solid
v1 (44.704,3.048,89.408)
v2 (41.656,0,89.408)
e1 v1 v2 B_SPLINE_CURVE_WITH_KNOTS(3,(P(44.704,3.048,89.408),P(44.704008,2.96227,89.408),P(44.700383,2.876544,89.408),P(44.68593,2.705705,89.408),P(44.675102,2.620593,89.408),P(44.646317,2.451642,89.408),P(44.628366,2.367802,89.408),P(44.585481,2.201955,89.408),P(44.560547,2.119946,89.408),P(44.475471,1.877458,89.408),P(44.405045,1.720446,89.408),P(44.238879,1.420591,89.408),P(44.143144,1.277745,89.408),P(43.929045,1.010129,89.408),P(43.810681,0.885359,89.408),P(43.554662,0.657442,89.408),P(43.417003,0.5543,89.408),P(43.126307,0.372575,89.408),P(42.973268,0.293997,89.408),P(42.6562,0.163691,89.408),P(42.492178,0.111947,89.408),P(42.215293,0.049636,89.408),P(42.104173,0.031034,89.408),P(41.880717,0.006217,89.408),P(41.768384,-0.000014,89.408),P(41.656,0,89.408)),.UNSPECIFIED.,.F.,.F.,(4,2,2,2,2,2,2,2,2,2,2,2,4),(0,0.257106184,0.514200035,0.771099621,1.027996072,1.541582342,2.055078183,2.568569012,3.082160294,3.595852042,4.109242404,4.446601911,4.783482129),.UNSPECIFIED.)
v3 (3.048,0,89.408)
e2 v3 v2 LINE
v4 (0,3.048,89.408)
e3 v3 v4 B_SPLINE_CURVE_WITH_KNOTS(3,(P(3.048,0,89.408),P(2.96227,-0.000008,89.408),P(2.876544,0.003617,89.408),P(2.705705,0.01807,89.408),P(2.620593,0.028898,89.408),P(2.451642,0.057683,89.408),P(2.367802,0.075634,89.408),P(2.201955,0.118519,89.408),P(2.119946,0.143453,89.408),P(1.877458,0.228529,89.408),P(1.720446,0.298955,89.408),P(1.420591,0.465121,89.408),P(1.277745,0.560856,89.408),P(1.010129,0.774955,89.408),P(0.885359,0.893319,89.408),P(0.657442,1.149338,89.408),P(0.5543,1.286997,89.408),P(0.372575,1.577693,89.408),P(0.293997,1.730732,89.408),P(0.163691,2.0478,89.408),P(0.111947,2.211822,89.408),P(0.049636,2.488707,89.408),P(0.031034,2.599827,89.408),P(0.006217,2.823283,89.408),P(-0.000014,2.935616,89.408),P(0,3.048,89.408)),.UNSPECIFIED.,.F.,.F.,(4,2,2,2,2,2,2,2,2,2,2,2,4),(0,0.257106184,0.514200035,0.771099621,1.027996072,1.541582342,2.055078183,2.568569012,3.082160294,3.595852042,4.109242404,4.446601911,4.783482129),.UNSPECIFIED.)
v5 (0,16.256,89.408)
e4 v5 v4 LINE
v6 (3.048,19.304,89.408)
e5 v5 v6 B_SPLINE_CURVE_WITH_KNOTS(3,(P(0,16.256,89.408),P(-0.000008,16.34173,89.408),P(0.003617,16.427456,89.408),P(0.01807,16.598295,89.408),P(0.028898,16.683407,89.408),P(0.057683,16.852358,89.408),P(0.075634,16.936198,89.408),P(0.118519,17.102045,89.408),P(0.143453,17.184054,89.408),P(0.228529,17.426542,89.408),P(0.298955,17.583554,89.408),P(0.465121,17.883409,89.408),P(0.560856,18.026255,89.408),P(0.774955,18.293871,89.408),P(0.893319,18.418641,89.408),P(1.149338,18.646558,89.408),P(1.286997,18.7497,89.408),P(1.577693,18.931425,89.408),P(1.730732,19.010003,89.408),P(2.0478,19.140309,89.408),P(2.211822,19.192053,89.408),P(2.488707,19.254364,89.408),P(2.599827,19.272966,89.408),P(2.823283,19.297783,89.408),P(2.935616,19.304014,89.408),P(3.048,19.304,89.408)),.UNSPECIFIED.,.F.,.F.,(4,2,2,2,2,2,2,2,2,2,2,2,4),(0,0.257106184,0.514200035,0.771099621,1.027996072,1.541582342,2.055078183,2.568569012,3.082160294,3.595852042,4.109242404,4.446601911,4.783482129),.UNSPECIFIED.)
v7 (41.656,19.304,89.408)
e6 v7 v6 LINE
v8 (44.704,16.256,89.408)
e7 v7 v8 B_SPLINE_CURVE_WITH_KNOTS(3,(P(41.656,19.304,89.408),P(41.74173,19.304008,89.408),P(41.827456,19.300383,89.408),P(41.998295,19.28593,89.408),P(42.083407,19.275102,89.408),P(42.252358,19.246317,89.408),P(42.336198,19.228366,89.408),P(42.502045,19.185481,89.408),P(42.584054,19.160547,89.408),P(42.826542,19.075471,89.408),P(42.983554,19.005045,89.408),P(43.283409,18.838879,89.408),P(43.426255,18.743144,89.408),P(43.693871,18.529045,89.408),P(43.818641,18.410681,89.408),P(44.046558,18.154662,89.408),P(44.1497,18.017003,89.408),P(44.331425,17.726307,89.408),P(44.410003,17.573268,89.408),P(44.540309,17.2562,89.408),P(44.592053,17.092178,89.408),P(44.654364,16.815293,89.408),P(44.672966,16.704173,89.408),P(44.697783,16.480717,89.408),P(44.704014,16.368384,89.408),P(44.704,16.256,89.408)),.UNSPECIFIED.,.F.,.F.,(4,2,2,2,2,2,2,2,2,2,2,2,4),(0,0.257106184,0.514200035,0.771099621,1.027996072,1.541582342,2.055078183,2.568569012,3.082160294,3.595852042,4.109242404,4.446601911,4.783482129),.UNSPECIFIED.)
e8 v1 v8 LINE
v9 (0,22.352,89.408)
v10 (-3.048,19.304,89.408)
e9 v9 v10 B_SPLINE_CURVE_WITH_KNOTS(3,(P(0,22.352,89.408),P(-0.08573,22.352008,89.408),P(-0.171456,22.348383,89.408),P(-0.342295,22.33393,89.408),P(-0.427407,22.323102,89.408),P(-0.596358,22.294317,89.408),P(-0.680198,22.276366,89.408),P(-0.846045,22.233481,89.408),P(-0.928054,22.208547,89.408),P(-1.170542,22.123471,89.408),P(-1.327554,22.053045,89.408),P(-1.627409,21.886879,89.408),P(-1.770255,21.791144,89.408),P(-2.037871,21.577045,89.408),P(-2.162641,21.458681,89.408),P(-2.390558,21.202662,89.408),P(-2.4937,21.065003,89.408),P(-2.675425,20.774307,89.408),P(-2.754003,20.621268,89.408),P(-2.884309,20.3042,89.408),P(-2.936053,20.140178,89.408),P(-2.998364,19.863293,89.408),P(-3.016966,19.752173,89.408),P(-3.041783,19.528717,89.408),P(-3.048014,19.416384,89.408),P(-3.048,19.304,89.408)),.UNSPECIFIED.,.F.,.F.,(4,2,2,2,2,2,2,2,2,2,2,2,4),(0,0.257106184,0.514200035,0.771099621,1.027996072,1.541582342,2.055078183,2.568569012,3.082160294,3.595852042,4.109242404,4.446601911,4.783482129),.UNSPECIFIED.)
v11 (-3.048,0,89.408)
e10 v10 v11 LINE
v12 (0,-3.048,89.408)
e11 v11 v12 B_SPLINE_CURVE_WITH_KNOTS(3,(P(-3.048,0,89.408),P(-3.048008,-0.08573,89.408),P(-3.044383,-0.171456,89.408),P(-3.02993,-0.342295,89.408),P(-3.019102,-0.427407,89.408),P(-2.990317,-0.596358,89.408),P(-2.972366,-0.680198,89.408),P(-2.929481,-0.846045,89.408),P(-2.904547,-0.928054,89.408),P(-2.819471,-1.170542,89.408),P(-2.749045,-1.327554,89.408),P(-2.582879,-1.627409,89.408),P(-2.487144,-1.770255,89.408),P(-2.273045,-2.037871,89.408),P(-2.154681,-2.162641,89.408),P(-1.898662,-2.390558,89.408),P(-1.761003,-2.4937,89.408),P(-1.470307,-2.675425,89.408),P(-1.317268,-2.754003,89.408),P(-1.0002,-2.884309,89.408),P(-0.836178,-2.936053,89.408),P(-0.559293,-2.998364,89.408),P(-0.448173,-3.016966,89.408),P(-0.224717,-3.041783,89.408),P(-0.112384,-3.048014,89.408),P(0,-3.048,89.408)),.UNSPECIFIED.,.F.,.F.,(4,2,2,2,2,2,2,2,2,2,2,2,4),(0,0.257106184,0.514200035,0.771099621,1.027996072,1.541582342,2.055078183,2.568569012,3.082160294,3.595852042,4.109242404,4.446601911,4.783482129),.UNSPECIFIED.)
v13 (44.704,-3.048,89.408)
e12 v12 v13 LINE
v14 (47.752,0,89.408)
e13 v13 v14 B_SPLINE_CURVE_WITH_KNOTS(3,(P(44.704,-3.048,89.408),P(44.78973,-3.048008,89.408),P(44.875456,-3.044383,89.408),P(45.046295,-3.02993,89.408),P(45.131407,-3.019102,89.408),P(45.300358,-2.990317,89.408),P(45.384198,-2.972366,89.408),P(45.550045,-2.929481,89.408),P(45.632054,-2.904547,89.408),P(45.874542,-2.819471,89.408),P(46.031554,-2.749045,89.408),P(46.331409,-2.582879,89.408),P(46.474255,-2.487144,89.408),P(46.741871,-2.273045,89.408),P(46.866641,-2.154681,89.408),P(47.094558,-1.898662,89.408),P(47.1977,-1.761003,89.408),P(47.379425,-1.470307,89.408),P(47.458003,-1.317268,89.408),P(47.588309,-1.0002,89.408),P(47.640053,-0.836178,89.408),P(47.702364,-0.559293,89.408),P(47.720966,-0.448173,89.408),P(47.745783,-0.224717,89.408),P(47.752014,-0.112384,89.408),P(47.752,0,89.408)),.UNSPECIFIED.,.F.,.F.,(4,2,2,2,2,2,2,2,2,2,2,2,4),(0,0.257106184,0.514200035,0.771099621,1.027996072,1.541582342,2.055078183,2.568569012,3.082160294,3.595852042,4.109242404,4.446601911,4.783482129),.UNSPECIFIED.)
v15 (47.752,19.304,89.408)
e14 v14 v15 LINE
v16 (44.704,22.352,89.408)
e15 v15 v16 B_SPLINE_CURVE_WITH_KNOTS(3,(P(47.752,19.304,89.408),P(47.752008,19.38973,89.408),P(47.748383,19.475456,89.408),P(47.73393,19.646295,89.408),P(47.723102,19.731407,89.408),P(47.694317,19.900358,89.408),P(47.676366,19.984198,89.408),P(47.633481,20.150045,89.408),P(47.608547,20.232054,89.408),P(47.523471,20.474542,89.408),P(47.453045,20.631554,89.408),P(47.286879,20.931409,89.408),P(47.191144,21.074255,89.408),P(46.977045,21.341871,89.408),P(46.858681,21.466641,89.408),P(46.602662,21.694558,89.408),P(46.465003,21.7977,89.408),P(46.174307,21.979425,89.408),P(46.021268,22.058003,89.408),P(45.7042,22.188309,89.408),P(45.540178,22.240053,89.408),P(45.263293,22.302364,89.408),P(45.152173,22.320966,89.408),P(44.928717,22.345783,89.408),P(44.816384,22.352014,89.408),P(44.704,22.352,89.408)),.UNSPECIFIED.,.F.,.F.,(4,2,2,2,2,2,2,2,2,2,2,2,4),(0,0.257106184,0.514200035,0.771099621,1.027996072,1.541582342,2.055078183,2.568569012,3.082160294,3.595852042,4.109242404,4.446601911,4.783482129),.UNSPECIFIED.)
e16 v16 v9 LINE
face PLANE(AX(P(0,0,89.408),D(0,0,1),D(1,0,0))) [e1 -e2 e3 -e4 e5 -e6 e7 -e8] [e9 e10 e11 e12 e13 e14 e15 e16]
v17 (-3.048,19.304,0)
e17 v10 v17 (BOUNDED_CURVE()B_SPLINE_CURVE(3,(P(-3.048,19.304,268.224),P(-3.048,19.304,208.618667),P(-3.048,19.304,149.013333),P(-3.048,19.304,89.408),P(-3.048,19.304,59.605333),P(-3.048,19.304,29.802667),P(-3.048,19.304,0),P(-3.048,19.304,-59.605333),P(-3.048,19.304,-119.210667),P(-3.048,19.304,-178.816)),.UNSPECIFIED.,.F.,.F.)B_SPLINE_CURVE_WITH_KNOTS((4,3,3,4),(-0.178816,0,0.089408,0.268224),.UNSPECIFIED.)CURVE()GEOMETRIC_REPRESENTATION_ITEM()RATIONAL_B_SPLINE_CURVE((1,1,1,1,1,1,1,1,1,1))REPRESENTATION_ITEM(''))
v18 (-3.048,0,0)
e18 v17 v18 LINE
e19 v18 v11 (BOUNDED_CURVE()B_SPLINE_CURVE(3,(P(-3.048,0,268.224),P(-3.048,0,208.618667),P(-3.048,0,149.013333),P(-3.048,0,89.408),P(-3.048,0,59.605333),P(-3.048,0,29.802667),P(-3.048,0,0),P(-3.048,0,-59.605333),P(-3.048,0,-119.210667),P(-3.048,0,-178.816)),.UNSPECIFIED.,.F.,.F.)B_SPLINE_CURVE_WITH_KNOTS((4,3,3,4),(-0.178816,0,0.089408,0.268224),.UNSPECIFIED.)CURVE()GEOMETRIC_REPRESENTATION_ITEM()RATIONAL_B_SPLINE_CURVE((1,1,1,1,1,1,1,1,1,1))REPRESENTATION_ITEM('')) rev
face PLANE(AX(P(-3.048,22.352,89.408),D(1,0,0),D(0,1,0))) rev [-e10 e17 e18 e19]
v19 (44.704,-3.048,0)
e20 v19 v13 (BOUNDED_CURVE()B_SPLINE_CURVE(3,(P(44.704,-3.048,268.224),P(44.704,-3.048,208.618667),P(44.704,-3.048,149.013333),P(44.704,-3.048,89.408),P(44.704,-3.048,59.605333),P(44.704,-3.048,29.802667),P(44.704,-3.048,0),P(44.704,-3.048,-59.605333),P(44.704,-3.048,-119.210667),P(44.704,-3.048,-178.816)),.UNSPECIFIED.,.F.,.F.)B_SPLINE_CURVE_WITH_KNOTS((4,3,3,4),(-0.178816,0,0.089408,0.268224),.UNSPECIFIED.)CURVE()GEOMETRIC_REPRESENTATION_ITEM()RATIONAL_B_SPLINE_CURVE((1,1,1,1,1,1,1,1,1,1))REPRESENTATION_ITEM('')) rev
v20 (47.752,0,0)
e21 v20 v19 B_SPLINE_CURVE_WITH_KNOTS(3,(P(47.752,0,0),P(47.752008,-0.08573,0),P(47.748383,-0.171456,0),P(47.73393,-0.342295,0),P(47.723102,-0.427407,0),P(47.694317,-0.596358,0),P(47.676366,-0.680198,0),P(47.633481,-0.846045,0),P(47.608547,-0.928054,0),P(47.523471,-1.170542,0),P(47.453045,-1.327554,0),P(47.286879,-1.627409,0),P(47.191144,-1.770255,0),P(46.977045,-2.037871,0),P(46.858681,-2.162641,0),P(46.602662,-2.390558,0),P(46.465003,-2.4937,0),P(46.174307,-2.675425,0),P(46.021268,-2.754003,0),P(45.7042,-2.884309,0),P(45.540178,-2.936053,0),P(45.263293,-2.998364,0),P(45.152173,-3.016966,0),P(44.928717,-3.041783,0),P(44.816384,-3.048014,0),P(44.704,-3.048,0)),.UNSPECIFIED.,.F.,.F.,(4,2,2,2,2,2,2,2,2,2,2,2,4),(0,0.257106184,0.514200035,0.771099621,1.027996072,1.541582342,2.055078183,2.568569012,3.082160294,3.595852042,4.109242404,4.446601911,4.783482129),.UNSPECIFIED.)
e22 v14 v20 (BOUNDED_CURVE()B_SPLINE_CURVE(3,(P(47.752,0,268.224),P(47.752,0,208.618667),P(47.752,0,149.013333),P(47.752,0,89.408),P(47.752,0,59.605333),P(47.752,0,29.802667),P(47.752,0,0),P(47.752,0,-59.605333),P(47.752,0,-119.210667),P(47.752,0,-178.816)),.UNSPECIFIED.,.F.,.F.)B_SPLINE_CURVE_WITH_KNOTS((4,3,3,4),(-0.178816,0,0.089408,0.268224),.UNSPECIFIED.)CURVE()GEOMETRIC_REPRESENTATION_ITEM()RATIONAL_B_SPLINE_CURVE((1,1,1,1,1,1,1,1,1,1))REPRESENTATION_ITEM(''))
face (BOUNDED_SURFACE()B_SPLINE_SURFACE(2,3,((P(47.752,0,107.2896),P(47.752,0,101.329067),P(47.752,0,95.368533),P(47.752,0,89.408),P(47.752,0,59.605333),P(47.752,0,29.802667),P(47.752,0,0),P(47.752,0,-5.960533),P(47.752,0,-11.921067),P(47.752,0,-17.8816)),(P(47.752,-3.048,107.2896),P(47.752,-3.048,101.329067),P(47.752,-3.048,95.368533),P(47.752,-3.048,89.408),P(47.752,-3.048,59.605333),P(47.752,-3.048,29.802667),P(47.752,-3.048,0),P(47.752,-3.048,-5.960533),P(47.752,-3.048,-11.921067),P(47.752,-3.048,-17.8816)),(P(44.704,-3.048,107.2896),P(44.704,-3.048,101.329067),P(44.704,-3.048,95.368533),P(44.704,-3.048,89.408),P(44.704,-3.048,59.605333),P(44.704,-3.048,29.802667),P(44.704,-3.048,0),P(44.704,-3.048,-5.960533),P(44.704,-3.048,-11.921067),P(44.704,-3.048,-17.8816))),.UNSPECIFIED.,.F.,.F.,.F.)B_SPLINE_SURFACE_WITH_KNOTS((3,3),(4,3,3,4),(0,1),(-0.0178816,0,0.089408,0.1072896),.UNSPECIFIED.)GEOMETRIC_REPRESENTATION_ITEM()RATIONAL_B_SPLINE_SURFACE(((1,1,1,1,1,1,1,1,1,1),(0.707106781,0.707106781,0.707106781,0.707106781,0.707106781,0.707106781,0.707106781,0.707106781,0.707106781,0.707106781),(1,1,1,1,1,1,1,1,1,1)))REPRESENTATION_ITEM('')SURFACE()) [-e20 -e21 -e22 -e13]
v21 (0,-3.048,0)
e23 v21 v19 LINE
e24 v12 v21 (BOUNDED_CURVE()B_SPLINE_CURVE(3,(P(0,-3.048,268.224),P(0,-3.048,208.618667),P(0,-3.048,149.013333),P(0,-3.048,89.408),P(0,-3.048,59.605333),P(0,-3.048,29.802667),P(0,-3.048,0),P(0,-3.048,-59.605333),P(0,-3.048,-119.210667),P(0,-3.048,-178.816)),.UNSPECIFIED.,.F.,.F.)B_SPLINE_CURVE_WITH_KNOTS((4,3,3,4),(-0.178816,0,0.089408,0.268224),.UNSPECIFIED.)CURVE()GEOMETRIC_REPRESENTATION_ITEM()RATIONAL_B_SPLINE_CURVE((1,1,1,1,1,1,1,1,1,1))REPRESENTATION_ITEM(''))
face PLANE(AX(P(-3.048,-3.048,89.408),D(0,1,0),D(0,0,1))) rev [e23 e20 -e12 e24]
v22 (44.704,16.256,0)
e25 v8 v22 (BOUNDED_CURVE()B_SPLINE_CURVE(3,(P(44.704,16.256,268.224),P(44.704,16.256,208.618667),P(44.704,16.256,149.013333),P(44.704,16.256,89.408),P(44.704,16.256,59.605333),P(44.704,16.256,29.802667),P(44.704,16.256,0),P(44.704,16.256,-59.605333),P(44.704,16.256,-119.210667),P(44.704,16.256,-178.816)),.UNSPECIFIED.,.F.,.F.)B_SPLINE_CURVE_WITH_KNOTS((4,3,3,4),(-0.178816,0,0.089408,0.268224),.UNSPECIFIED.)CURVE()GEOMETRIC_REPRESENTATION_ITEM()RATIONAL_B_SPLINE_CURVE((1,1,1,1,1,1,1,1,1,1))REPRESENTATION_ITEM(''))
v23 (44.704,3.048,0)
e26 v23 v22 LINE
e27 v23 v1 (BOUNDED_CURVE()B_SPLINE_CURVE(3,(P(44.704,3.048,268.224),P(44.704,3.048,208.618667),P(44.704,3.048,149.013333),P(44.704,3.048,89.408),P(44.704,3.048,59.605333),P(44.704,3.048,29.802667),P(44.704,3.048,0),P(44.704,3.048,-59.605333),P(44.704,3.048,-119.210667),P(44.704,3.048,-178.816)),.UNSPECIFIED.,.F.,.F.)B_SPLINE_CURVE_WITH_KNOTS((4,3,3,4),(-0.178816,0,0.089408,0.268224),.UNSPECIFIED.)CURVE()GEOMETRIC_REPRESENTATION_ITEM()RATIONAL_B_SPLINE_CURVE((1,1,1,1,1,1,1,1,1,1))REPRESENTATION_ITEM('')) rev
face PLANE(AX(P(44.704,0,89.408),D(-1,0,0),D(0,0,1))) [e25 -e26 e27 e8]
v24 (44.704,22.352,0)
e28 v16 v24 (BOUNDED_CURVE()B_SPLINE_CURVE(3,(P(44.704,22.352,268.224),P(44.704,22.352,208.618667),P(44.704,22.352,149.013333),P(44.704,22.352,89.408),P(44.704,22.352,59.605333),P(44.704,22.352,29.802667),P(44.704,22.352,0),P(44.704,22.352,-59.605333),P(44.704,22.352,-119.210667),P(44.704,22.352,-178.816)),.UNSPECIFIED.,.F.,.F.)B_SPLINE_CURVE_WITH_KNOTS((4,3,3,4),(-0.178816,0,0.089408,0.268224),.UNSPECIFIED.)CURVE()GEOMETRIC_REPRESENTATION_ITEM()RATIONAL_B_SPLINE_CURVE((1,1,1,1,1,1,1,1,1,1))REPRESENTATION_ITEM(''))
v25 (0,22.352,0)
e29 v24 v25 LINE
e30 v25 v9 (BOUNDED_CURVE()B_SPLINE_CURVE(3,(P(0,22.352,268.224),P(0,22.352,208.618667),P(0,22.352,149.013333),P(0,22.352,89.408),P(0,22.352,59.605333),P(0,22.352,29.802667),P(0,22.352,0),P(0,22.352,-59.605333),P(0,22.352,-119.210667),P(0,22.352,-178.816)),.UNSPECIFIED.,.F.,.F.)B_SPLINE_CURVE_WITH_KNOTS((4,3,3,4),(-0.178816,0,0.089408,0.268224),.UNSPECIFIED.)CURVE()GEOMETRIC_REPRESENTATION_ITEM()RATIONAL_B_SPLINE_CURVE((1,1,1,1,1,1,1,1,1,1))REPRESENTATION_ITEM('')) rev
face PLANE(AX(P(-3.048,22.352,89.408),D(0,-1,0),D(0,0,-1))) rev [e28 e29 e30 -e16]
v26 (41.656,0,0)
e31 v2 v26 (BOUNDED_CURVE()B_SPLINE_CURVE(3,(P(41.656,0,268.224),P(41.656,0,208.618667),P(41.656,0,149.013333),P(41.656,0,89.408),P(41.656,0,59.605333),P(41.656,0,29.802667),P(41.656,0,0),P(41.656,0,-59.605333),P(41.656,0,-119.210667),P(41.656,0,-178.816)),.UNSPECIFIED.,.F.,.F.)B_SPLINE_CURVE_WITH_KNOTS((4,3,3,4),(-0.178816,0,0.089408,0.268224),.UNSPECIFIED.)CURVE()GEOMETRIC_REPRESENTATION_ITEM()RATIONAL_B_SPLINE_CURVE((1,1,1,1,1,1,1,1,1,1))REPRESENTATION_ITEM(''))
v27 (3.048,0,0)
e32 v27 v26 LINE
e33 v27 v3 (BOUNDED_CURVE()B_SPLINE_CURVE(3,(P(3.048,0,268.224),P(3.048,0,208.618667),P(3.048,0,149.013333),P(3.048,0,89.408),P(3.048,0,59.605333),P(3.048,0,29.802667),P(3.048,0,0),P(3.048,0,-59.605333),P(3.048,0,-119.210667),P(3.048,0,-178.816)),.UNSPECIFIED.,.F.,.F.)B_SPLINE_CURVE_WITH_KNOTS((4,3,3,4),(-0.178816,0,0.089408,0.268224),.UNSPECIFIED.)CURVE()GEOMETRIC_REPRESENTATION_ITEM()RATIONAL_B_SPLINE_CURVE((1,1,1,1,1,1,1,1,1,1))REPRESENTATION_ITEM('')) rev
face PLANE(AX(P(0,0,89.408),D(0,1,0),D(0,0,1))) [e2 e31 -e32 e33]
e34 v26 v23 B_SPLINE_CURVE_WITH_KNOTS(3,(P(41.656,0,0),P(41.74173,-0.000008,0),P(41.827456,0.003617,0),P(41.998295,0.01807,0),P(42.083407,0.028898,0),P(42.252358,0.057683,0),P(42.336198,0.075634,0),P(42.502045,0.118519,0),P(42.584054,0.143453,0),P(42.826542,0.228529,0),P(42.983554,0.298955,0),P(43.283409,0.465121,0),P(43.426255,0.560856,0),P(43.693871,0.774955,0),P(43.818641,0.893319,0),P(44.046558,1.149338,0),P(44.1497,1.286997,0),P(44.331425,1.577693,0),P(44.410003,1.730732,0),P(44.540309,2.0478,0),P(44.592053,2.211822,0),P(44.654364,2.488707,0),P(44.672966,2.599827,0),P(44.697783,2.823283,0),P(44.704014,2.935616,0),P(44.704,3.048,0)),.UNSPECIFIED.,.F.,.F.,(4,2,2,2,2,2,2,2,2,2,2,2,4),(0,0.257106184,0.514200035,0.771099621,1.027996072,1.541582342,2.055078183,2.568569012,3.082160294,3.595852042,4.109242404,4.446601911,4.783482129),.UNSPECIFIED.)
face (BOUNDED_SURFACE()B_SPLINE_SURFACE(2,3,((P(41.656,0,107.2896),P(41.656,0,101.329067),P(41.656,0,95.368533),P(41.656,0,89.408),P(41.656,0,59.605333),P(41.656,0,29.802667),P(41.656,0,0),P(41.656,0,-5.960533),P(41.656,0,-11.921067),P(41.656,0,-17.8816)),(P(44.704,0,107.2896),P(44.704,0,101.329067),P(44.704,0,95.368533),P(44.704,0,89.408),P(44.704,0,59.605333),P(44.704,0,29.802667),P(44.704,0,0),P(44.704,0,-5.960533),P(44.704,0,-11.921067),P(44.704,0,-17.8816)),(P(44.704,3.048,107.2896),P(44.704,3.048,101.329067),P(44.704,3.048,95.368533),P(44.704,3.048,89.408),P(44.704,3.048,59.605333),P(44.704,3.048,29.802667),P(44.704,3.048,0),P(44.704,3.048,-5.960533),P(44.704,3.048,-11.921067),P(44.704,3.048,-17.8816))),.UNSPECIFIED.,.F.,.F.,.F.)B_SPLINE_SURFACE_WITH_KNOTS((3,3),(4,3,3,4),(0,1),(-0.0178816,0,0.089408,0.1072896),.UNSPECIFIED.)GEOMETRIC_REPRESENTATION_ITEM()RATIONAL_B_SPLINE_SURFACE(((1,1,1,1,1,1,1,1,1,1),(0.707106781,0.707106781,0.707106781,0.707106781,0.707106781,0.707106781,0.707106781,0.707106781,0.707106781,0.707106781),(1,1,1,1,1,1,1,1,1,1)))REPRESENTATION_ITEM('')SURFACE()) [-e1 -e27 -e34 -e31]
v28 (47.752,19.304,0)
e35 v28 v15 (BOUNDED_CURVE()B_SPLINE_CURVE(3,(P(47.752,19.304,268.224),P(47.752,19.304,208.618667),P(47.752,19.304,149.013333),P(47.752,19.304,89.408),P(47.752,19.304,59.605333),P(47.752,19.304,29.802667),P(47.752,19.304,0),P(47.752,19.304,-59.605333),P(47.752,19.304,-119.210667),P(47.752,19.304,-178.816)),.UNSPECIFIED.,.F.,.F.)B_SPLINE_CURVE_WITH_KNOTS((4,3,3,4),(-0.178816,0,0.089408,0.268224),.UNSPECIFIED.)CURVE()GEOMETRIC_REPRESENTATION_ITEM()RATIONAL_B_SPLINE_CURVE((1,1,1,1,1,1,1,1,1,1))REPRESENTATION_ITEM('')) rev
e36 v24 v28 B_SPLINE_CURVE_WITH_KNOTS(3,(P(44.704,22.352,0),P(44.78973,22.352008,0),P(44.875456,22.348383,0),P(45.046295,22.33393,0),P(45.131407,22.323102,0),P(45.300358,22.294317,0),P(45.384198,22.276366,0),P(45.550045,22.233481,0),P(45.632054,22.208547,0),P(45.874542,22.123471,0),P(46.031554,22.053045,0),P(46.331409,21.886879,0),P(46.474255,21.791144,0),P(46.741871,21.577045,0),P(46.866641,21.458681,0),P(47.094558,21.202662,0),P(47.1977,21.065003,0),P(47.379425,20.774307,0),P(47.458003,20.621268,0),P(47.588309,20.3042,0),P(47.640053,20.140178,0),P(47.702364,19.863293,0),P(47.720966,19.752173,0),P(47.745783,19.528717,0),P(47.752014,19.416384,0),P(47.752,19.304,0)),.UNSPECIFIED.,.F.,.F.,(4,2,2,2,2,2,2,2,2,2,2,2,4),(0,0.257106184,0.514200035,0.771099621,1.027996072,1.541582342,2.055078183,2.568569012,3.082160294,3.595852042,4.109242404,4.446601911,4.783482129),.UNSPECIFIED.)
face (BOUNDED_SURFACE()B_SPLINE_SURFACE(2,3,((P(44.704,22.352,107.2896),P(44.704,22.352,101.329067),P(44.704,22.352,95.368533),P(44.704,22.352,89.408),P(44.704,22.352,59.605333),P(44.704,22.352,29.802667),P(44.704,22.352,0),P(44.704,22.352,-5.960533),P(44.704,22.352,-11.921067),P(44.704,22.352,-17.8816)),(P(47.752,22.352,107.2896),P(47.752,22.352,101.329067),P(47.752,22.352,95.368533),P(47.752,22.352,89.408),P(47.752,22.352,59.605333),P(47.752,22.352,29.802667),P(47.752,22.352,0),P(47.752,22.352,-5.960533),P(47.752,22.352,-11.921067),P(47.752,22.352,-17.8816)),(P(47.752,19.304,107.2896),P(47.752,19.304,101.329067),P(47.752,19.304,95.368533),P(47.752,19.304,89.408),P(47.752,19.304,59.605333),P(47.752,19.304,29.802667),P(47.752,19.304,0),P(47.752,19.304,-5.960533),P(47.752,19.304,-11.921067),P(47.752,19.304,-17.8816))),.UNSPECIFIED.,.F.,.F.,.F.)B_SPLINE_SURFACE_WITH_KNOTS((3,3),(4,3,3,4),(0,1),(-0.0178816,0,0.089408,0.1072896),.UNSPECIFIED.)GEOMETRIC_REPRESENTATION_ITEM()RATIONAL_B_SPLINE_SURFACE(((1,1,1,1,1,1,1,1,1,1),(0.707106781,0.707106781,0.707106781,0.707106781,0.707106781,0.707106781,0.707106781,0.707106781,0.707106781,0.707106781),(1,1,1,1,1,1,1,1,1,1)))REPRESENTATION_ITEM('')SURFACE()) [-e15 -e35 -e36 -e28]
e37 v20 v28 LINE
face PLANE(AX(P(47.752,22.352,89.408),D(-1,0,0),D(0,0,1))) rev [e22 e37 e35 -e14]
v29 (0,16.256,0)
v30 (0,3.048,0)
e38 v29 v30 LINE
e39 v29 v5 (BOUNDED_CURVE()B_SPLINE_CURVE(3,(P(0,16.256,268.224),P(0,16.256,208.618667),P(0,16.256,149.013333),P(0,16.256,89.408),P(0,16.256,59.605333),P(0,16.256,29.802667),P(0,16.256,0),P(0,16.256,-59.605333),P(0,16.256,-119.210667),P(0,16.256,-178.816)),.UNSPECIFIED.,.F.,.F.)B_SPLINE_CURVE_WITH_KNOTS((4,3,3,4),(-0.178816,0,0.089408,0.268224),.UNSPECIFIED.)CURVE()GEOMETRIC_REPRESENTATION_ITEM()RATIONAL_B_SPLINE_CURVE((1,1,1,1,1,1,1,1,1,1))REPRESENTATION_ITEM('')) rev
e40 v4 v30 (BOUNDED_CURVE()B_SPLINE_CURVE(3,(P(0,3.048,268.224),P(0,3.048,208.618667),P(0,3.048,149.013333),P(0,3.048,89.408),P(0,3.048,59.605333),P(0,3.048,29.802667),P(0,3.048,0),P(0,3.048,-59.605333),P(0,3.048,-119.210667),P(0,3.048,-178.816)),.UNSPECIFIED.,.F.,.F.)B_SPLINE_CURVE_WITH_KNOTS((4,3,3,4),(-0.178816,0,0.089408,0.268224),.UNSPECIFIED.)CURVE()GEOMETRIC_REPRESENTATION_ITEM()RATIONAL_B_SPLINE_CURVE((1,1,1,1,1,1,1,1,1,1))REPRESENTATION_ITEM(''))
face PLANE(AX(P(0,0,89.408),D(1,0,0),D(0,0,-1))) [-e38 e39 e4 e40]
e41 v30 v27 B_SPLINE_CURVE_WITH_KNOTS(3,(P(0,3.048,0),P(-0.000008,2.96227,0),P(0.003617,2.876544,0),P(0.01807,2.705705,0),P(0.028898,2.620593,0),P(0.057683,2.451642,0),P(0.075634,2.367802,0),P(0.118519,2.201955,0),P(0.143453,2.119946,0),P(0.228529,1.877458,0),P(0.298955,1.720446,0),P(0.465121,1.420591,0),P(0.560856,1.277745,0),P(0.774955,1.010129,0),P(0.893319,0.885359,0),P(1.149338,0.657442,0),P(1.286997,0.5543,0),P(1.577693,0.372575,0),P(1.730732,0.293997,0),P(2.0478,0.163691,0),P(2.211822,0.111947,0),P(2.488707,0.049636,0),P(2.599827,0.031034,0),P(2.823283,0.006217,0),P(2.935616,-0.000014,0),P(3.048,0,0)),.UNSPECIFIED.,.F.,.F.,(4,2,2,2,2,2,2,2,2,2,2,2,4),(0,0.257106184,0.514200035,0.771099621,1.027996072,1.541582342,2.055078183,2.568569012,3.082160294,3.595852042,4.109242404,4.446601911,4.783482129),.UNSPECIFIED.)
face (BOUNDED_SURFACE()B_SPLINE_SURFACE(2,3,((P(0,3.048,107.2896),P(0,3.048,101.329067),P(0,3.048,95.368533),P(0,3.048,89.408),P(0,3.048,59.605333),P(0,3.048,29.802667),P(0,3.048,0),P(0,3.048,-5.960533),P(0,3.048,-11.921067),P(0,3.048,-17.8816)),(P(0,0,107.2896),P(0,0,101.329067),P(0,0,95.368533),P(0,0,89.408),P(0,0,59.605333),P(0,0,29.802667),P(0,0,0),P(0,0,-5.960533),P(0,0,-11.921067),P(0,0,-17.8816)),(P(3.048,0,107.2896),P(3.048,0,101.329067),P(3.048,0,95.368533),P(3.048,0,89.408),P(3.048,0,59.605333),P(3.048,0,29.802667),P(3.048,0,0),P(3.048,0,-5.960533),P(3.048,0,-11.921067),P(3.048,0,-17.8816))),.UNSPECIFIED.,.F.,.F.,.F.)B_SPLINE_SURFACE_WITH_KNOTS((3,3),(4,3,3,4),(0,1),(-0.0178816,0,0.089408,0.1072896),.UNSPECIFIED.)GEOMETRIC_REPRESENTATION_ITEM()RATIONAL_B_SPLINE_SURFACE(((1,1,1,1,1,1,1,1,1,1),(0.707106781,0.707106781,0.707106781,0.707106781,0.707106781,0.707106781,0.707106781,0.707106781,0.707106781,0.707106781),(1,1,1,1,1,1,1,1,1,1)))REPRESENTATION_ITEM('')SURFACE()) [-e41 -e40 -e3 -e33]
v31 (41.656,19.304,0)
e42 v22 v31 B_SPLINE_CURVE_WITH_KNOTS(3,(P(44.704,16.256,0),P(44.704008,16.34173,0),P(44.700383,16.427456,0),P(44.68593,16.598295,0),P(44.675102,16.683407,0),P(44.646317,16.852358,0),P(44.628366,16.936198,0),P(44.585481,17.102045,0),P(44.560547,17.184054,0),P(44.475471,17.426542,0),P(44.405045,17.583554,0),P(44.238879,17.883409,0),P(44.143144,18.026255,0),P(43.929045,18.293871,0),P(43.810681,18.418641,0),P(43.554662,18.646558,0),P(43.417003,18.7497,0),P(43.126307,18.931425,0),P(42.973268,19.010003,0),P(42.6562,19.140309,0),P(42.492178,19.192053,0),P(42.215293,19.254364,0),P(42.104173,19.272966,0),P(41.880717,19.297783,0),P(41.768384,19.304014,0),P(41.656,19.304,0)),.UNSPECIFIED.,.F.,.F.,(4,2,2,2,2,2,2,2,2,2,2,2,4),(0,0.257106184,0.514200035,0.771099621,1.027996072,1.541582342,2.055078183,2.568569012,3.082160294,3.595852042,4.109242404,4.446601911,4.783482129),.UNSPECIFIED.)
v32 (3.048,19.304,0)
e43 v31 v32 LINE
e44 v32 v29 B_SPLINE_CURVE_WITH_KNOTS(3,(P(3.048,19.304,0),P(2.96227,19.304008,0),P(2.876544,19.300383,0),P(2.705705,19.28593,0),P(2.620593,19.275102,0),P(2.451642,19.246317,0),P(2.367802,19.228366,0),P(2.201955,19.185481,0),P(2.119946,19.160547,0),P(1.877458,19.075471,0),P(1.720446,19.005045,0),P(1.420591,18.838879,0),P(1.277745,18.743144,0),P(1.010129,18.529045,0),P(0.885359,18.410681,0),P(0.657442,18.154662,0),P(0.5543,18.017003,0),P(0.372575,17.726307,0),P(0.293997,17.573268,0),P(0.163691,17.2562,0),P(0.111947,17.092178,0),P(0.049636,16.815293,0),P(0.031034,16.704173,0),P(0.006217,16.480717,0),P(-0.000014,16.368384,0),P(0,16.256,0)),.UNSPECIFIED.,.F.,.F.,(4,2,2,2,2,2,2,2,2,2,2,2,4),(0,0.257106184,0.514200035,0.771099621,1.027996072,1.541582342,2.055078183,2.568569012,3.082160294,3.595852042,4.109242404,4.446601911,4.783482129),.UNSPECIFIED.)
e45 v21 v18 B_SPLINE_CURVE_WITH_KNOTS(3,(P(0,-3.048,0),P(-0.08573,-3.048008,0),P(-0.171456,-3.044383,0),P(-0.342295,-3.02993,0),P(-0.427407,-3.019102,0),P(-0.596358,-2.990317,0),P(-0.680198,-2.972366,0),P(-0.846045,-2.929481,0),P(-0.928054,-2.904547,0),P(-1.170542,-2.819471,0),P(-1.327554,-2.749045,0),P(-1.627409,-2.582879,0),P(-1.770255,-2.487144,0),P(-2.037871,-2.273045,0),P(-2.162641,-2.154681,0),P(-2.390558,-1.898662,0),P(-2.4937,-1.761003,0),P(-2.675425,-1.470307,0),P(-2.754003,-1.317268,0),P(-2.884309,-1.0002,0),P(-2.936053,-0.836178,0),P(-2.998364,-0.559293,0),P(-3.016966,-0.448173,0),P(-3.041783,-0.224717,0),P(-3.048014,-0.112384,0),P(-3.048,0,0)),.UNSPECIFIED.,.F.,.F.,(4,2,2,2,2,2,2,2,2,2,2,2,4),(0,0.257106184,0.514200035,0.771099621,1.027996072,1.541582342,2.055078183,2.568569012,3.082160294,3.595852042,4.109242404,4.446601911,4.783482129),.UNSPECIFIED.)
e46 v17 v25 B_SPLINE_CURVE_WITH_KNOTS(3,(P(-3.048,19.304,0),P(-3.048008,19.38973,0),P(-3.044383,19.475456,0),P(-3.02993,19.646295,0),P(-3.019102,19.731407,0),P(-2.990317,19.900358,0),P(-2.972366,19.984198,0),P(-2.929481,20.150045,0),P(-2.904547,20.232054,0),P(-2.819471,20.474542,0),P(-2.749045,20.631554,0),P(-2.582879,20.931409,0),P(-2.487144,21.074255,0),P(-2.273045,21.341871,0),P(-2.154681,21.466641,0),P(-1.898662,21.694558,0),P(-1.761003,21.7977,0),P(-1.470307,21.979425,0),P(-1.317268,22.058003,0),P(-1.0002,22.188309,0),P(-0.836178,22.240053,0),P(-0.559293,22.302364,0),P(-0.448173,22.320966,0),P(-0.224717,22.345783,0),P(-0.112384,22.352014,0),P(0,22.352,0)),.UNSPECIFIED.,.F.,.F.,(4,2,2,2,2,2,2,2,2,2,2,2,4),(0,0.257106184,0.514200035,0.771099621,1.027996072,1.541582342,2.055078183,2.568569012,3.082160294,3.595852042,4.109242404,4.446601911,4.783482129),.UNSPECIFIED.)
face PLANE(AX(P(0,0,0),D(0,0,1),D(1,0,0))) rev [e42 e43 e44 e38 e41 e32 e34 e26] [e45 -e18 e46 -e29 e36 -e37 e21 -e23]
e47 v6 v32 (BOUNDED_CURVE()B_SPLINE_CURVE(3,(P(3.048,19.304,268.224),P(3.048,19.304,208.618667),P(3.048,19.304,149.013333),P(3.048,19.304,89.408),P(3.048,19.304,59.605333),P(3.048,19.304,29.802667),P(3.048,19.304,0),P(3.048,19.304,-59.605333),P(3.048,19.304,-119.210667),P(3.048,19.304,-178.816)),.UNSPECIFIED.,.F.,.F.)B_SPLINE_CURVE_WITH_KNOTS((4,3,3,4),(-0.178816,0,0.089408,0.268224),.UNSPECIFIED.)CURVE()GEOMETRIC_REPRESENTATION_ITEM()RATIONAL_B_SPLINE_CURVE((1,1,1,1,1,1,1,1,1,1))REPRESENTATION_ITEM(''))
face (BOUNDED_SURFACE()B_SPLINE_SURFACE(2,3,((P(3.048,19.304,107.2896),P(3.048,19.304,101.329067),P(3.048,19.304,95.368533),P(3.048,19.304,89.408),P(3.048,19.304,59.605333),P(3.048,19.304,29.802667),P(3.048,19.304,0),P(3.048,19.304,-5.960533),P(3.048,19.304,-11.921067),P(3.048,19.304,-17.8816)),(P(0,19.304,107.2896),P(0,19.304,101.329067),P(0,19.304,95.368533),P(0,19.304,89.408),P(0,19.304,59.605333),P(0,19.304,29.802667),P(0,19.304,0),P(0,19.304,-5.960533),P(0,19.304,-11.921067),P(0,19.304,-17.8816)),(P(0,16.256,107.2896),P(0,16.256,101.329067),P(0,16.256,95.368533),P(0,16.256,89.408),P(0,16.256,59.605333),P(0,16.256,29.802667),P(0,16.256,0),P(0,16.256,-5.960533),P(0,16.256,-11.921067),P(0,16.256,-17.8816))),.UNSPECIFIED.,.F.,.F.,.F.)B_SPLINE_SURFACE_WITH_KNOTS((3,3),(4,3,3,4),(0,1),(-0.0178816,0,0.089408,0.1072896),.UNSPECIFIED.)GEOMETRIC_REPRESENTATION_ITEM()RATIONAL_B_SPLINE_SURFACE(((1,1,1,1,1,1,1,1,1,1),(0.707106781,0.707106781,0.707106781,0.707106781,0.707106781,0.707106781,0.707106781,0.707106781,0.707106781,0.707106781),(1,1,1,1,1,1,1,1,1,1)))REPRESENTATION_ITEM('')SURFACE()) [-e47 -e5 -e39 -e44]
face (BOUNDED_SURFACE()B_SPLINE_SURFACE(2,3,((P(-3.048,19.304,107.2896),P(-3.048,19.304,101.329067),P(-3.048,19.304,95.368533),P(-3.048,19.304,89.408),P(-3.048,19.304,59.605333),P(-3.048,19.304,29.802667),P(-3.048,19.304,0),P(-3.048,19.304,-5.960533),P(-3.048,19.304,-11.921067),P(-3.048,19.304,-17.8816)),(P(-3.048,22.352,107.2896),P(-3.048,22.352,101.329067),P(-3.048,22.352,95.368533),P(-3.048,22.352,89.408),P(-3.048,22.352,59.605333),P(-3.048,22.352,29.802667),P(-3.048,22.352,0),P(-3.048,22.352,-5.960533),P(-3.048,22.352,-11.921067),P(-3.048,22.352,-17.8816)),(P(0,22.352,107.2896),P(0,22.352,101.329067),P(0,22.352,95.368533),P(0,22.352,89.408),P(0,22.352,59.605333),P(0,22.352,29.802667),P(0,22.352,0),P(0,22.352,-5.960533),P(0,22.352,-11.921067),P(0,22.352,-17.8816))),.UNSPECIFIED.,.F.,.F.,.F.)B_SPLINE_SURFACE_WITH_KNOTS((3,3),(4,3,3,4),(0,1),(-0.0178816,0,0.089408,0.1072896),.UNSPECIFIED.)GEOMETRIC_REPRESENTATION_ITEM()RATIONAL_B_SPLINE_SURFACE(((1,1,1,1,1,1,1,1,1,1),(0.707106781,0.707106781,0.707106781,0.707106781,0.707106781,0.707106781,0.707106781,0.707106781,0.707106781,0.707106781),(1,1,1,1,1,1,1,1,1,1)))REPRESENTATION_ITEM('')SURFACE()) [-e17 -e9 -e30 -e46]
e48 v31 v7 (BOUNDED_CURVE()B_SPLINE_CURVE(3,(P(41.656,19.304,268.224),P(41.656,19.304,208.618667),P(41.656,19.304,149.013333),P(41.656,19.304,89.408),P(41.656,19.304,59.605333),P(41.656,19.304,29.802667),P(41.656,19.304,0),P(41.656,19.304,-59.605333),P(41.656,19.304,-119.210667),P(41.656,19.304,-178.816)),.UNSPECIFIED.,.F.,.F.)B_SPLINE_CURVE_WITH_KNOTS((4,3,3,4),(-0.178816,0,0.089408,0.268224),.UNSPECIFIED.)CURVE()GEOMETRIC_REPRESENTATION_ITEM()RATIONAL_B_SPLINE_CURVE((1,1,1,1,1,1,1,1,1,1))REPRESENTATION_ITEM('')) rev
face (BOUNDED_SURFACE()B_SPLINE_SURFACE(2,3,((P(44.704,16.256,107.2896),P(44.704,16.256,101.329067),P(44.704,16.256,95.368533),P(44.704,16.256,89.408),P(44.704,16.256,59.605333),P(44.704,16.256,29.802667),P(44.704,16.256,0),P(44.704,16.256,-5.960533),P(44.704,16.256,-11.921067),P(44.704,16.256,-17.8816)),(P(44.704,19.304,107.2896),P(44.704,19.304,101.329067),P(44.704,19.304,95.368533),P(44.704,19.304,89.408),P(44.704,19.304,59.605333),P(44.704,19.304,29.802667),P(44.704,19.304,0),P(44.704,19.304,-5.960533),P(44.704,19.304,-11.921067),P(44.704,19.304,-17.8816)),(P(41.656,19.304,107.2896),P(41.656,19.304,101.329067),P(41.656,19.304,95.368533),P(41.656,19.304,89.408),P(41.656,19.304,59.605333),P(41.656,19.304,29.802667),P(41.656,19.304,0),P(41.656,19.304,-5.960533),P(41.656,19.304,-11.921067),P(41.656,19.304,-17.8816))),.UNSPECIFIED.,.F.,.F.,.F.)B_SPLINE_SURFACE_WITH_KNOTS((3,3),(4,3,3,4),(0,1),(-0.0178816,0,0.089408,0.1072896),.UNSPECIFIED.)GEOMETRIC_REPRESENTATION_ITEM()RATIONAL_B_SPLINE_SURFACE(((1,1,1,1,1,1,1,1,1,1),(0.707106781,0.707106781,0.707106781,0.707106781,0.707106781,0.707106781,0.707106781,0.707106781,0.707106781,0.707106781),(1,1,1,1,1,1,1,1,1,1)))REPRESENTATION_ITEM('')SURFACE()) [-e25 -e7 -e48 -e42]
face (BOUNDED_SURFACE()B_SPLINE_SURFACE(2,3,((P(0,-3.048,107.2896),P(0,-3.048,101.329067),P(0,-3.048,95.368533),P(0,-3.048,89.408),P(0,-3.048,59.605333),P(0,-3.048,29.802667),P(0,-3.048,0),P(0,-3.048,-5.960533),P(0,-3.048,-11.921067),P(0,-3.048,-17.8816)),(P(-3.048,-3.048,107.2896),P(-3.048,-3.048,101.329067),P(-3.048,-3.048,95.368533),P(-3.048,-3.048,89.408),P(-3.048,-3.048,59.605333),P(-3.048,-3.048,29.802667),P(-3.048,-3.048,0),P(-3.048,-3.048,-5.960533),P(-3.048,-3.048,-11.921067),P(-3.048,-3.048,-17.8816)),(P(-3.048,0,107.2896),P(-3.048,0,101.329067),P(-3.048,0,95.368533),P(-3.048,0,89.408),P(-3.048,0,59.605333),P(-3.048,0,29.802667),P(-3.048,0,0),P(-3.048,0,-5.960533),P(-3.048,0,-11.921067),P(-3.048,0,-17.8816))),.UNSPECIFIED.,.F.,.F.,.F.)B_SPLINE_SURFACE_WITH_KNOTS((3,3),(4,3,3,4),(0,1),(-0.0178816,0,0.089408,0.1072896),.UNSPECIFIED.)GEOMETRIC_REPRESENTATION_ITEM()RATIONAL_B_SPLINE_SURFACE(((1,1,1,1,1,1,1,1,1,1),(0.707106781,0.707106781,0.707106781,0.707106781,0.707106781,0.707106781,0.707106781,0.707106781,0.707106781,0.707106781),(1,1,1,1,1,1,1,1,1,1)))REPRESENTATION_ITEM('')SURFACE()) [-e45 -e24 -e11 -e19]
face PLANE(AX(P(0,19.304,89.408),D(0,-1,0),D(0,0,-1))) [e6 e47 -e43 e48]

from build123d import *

# Parameters (mm, degrees)
SKETCH1_W           = 50.8
SKETCH1_H           = 25.4
SKETCH1_W_2         = 44.704
SKETCH1_H_2         = 19.304
BOSS_EXTRUDE1_DEPTH = 89.408
VARFILLET1_R        = 3.048


with BuildPart() as part:
    # Sketch1 → Boss-Extrude1 (new body)
    with BuildSketch(Plane.XY):
        with Locations((22.352, 9.652)):
            Rectangle(SKETCH1_W, SKETCH1_H)
        with Locations((22.352, 9.652)):
            Rectangle(SKETCH1_W_2, SKETCH1_H_2, mode=Mode.SUBTRACT)
    extrude(amount=BOSS_EXTRUDE1_DEPTH)

    # VarFillet1
    varfillet1_edges = [part.edges().sort_by_distance(p)[0] for p in [
        (0, 19.304, 44.704),
        (0, 0, 44.704),
        (44.704, 19.304, 44.704),
        (44.704, 0, 44.704),
        (47.752, -3.048, 44.704),
        (47.752, 22.352, 44.704),
        (-3.048, 22.352, 44.704),
        (-3.048, -3.048, 44.704),
    ]]
    fillet(varfillet1_edges, radius=VARFILLET1_R)


solid = part.part
